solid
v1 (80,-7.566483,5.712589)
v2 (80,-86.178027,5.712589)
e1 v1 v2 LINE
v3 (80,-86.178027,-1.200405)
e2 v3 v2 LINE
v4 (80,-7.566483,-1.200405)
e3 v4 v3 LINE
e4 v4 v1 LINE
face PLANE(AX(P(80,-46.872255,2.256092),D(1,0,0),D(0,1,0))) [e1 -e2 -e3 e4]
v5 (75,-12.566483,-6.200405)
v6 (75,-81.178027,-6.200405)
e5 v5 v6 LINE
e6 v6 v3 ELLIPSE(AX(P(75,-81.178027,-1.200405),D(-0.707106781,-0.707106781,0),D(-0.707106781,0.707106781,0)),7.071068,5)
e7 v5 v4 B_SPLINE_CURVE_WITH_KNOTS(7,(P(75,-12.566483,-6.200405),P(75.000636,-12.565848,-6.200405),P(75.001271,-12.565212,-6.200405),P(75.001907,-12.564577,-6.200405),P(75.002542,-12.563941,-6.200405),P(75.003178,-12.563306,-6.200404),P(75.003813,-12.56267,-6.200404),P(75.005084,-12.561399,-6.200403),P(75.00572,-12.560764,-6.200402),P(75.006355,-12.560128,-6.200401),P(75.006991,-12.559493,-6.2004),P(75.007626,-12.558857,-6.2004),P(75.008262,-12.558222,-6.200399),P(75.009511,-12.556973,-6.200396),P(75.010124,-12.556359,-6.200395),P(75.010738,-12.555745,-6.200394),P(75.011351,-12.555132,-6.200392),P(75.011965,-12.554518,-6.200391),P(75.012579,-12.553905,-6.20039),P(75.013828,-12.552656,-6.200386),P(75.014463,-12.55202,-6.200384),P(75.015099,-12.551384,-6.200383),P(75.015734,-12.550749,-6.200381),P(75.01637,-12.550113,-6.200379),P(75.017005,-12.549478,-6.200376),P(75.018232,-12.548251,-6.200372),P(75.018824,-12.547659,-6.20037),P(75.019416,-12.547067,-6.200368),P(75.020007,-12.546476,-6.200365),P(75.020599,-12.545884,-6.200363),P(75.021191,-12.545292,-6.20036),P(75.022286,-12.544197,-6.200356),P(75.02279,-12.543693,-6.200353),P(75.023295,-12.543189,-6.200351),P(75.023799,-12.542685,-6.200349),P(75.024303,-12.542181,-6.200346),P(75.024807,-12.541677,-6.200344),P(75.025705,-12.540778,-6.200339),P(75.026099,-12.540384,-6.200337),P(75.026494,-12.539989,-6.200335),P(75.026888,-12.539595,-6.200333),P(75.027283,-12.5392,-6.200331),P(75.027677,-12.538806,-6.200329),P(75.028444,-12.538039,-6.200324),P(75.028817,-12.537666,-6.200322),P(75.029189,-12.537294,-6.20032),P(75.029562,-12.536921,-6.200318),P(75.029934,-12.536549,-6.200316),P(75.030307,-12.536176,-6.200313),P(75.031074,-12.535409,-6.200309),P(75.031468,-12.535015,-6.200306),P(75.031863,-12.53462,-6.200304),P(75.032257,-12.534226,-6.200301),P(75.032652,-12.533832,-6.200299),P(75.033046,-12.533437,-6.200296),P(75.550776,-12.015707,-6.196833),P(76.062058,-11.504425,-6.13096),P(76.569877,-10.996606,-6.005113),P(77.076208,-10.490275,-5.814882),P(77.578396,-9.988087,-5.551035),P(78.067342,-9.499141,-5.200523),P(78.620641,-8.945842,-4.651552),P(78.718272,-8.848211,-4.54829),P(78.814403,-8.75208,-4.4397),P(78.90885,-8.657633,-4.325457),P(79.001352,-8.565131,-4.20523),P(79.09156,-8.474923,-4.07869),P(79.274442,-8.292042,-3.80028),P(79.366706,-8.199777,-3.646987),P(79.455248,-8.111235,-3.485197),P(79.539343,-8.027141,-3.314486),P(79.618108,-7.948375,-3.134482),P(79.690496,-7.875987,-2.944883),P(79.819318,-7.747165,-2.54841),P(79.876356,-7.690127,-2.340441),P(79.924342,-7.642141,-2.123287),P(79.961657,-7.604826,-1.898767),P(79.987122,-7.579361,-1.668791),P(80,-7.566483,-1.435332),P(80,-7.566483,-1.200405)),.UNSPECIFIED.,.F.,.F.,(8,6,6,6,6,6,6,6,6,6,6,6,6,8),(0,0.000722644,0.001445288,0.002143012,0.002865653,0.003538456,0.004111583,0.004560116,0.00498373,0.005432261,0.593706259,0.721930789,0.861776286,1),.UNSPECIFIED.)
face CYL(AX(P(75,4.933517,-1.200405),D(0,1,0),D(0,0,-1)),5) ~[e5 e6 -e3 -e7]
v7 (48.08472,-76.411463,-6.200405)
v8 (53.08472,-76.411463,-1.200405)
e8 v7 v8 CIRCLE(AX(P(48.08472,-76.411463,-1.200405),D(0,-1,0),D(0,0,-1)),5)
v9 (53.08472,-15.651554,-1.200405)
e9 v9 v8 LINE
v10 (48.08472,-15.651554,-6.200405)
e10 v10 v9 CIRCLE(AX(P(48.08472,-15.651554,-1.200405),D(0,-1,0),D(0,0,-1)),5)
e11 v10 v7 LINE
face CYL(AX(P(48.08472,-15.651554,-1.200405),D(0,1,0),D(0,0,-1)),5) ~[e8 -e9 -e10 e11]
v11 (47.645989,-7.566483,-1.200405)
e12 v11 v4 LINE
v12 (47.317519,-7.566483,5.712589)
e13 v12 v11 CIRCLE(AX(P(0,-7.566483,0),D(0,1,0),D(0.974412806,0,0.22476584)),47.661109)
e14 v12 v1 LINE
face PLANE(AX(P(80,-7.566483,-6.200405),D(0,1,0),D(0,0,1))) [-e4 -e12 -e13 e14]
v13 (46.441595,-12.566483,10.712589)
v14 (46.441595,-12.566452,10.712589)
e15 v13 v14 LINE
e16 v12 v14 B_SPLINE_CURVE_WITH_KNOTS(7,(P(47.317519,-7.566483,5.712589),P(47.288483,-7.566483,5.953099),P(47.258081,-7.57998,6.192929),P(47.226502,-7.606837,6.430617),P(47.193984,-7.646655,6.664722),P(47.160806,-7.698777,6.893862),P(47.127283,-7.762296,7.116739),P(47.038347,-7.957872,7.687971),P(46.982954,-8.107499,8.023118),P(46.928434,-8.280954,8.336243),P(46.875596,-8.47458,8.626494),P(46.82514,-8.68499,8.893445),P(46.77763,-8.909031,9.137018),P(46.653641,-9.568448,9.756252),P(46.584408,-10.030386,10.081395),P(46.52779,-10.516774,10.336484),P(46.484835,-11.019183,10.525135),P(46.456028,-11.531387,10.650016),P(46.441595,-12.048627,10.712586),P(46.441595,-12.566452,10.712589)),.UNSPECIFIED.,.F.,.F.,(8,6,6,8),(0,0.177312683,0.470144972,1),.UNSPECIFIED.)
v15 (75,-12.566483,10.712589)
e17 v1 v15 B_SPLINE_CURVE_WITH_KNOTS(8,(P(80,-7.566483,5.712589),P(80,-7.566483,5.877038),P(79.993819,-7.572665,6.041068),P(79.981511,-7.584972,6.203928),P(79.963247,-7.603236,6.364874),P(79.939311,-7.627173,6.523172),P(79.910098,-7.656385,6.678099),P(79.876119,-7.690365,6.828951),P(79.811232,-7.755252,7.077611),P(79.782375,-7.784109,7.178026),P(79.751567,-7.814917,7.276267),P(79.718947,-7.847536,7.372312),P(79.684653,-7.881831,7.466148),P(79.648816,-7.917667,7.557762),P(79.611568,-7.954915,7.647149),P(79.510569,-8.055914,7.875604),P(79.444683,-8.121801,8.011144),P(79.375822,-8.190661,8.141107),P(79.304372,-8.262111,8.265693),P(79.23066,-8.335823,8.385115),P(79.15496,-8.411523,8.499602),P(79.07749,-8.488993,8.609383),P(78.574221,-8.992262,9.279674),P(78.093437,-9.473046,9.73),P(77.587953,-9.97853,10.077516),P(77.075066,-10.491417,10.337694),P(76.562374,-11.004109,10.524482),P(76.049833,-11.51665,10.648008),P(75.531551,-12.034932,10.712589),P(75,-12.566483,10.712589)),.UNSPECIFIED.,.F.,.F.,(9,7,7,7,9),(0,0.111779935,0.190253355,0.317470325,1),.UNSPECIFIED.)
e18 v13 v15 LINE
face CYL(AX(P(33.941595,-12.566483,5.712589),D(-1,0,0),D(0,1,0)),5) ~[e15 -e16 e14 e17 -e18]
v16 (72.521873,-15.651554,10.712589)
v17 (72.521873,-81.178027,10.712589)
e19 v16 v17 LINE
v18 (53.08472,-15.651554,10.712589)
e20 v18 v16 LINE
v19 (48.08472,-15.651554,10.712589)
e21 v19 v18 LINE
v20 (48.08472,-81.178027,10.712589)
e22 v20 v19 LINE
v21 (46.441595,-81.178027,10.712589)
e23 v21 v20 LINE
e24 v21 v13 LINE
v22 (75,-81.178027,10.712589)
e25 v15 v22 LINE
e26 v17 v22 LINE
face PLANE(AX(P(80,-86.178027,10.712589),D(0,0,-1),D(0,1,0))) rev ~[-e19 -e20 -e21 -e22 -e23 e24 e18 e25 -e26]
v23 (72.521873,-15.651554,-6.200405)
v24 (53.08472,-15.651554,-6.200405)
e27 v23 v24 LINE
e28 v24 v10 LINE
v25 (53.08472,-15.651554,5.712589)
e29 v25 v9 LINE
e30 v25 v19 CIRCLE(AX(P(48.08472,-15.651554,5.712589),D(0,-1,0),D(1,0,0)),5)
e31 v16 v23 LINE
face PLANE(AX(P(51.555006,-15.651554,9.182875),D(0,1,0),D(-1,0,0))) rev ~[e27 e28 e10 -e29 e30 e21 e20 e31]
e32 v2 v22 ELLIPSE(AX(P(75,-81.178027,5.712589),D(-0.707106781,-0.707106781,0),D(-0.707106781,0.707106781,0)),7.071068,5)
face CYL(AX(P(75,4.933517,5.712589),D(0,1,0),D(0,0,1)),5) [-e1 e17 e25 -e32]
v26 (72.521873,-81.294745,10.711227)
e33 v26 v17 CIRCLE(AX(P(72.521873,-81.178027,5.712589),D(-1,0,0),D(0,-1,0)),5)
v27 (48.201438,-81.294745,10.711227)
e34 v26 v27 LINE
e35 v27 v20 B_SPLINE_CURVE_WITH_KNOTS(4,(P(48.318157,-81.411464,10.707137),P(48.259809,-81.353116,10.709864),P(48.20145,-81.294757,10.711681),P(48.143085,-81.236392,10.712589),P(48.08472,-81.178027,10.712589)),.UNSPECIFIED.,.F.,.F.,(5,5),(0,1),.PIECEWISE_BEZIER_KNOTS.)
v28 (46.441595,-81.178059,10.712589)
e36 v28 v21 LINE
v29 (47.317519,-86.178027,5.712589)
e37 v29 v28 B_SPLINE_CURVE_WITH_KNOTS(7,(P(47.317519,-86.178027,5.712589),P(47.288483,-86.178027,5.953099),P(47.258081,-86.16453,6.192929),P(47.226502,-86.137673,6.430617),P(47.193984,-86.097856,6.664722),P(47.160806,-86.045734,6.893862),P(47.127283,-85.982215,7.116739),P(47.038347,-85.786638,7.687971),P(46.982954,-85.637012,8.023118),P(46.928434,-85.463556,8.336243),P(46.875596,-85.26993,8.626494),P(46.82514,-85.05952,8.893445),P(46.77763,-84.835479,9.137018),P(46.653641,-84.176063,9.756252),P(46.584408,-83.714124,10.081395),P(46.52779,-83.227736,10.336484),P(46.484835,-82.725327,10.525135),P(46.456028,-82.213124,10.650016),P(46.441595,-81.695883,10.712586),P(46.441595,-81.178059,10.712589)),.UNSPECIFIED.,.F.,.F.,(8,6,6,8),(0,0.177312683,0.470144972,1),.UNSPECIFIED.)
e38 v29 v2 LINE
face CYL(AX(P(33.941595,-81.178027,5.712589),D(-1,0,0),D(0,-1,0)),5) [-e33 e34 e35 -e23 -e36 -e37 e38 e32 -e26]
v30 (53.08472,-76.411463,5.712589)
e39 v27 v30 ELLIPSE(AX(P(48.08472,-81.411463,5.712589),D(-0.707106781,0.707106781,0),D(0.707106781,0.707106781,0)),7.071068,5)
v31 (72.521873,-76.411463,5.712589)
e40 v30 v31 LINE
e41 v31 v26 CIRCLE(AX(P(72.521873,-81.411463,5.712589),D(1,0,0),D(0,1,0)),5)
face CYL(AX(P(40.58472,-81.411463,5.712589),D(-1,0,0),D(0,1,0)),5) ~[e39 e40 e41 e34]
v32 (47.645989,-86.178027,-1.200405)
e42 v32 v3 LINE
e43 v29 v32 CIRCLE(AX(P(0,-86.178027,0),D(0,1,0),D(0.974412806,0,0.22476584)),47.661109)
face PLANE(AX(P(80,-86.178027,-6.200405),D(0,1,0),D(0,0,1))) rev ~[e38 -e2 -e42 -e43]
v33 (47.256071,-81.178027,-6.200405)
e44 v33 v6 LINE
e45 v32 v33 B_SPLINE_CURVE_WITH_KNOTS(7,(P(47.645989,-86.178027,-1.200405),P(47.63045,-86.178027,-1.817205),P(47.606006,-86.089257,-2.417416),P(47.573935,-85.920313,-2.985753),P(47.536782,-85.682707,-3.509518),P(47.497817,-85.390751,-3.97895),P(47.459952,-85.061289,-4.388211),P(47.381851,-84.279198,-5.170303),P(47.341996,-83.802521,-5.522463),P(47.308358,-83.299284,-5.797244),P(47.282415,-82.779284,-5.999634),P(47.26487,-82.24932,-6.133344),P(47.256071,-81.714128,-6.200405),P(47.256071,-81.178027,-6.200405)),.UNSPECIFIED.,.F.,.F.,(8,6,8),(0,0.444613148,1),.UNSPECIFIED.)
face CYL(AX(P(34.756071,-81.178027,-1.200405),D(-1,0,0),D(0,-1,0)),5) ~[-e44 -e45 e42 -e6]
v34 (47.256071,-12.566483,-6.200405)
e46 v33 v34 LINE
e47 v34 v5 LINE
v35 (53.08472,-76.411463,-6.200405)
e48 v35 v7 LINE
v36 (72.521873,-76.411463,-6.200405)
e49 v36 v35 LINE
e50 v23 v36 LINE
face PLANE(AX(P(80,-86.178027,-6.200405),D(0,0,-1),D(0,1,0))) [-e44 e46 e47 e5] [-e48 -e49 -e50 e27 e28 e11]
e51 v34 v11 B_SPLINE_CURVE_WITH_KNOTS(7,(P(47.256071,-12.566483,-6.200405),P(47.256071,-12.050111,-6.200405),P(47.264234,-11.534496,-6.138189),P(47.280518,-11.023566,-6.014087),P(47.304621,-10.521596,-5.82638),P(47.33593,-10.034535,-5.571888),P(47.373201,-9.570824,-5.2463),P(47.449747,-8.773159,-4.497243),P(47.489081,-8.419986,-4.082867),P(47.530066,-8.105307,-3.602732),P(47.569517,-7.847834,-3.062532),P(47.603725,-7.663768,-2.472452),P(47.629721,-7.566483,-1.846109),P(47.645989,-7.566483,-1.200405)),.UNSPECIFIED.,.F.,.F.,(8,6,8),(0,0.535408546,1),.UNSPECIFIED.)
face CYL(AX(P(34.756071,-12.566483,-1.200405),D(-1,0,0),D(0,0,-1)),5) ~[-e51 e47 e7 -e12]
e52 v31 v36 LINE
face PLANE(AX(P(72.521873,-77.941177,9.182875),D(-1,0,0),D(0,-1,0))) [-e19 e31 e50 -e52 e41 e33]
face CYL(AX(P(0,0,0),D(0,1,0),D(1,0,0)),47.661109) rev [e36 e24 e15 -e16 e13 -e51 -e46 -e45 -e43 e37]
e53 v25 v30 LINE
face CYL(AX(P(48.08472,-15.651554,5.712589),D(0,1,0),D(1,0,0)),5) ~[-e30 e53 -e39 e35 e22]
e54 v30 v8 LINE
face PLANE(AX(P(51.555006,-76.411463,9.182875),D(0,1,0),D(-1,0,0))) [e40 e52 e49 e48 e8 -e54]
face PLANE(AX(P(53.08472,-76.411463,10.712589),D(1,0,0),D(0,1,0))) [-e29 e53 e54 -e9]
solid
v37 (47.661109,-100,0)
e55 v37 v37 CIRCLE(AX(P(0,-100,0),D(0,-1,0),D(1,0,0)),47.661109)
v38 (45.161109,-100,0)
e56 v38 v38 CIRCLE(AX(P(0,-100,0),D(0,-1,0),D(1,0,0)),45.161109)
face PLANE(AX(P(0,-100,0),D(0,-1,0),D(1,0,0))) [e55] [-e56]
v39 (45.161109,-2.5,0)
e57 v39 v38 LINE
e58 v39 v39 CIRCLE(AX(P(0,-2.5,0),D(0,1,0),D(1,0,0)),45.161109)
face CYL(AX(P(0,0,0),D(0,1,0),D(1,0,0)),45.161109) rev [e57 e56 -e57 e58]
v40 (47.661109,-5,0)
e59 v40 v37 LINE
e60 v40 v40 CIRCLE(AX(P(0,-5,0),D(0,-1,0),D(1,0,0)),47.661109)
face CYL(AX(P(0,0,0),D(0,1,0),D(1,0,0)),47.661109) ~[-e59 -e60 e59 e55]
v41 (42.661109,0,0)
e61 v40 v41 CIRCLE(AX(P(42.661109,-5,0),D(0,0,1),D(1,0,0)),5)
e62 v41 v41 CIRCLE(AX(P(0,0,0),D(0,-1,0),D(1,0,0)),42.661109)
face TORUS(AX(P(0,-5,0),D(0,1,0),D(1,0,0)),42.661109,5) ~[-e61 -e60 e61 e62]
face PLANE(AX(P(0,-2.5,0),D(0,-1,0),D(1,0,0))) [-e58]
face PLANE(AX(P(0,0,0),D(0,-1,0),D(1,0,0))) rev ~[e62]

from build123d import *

# Parameters (mm, degrees)
F0_R         = 47.6611087375
F1_DEPTH     = 100
F2_T         = -2.5
F4_W         = 78.6115438677
F4_H         = 16.9129944406
F6_W         = 19.4371528924
F6_H         = 60.759909451
F7_DEPTH     = 25
F8_T1_DEPTH  = 57.743928854
F8_T3_DEPTH  = 58.5584052808
F8_T5_DEPTH  = 103.6115438677
F8_T7_DEPTH  = 60.759909451
F8_T9_DEPTH  = 19.4371528924
F8_T15_DEPTH = 73.259909451
F8_T20_DEPTH = 31.9371528924
F8_S22_R     = 47.6611087375
F8_T23_DEPTH = 18
F9_R         = 5


# Not quite as in the source:
# - a fillet or chamfer that OpenCascade refuses, or shapes differently, is made with other operations: its cross-section is extruded or revolved along the edge and cut away or added


with BuildPart() as f1:
    # F0 (on Front) → F1 (new body)
    with BuildSketch(Plane.XZ):
        Circle(F0_R)
    extrude(amount=F1_DEPTH)

    # F2
    f2_openings = [f1.faces().sort_by_distance(p)[0] for p in [
        (0, -100, 0),
    ]]
    offset(amount=F2_T, openings=f2_openings)


with BuildPart() as f5:
    # F4 (on offset) → F5 (new body, up to the next surface of F1)
    with BuildSketch(Plane.YZ.offset(80)):
        with Locations((-46.8722551595, 2.2560919169)):
            Rectangle(F4_W, F4_H)
    extrude(until=Until.NEXT, target=f1.part, dir=(-1, 0, 0))

    # F6 (on face) → F7 (cut)
    with BuildSketch(Plane.XY.offset(10.7125891373)):
        with Locations((62.8032963723, -46.0315085948)):
            Rectangle(F6_W, F6_H)
    extrude(amount=-F7_DEPTH, mode=Mode.SUBTRACT)

    # F8: fillet of radius 5 on 9 edges, made by hand

    # F8_s2 → F8_t1 (cut)
    with BuildSketch(Plane.YZ.offset(34.756071146)):
        with BuildLine():
            ThreePointArc((-86.1780270934, -1.2004053034), (-84.7135609993, -4.7359392093), (-81.1780270934, -6.2004053034))
            Line((-81.1780270934, -6.2004053034), (-86.1780270934, -6.2004053034))
            Line((-86.1780270934, -6.2004053034), (-86.1780270934, -1.2004053034))
        make_face()
        with BuildLine():
            ThreePointArc((-12.5664832257, -6.2004053034), (-9.0309493197, -4.7359392093), (-7.5664832257, -1.2004053034))
            Line((-7.5664832257, -1.2004053034), (-7.5664832257, -6.2004053034))
            Line((-7.5664832257, -6.2004053034), (-12.5664832257, -6.2004053034))
        make_face()
    extrude(amount=F8_T1_DEPTH, mode=Mode.SUBTRACT)

    # F8_s4 → F8_t3 (cut)
    with BuildSketch(Plane.YZ.offset(33.9415947192)):
        with BuildLine():
            ThreePointArc((-86.1780270934, 5.7125891373), (-84.7135609993, 9.2481230432), (-81.1780270934, 10.7125891373))
            Line((-81.1780270934, 10.7125891373), (-86.1780270934, 10.7125891373))
            Line((-86.1780270934, 10.7125891373), (-86.1780270934, 5.7125891373))
        make_face()
        with BuildLine():
            ThreePointArc((-7.5664832257, 5.7125891373), (-9.0309493197, 9.2481230432), (-12.5664832257, 10.7125891373))
            Line((-12.5664832257, 10.7125891373), (-7.5664832257, 10.7125891373))
            Line((-7.5664832257, 10.7125891373), (-7.5664832257, 5.7125891373))
        make_face()
    extrude(amount=F8_T3_DEPTH, mode=Mode.SUBTRACT)

    # F8_s6 → F8_t5 (cut)
    with BuildSketch(Plane.XZ.offset(-4.9335167743)):
        with BuildLine():
            ThreePointArc((75, 10.7125891373), (78.5355339059, 9.2481230432), (80, 5.7125891373))
            Line((80, 5.7125891373), (80, 10.7125891373))
            Line((80, 10.7125891373), (75, 10.7125891373))
        make_face()
        with BuildLine():
            ThreePointArc((75, -6.2004053034), (78.5355339059, -4.7359392093), (80, -1.2004053034))
            Line((80, -1.2004053034), (80, -6.2004053034))
            Line((80, -6.2004053034), (75, -6.2004053034))
        make_face()
    extrude(amount=F8_T5_DEPTH, mode=Mode.SUBTRACT)

    # F8_s8 → F8_t7 (cut)
    with BuildSketch(Plane.XZ.offset(15.6515538692)):
        with BuildLine():
            ThreePointArc((53.0847199261, 5.7125891373), (51.6202538321, 9.2481230432), (48.0847199261, 10.7125891373))
            Line((48.0847199261, 10.7125891373), (53.0847199261, 10.7125891373))
            Line((53.0847199261, 10.7125891373), (53.0847199261, 5.7125891373))
        make_face()
        with BuildLine():
            ThreePointArc((48.0847199261, -6.2004053034), (51.6202538321, -4.7359392093), (53.0847199261, -1.2004053034))
            Line((53.0847199261, -1.2004053034), (53.0847199261, -6.2004053034))
            Line((53.0847199261, -6.2004053034), (48.0847199261, -6.2004053034))
        make_face()
    extrude(amount=F8_T7_DEPTH, mode=Mode.SUBTRACT)

    # F8_s10 → F8_t9 (cut)
    with BuildSketch(Plane.YZ.offset(53.0847199261)):
        with BuildLine():
            ThreePointArc((-76.4114633203, 5.7125891373), (-77.8759294143, 9.2481230432), (-81.4114633203, 10.7125891373))
            Line((-81.4114633203, 10.7125891373), (-76.4114633203, 10.7125891373))
            Line((-76.4114633203, 10.7125891373), (-76.4114633203, 5.7125891373))
        make_face()
    extrude(amount=F8_T9_DEPTH, mode=Mode.SUBTRACT)


with BuildPart() as f8_tool13:
    # F8_s14 → F8_t15 (new body)
    with BuildSketch(Plane.XZ.offset(15.6515538692)):
        with BuildLine():
            ThreePointArc((53.0847199261, 5.7125891373), (51.6202538321, 9.2481230432), (48.0847199261, 10.7125891373))
            Line((48.0847199261, 10.7125891373), (53.0847199261, 10.7125891373))
            Line((53.0847199261, 10.7125891373), (53.0847199261, 5.7125891373))
        make_face()
    extrude(amount=F8_T15_DEPTH)

    split(bisect_by=Plane.XZ.offset(86.1780270934), keep=Keep.BOTTOM)

    split(bisect_by=Plane.XZ.offset(76.4114633203), keep=Keep.TOP)


with BuildPart() as f8_tool18:
    # F8_s19 → F8_t20 (new body)
    with BuildSketch(Plane.YZ.offset(40.5847199261)):
        with BuildLine():
            ThreePointArc((-76.4114633203, 5.7125891373), (-77.8759294143, 9.2481230432), (-81.4114633203, 10.7125891373))
            Line((-81.4114633203, 10.7125891373), (-76.4114633203, 10.7125891373))
            Line((-76.4114633203, 10.7125891373), (-76.4114633203, 5.7125891373))
        make_face()
    extrude(amount=F8_T20_DEPTH)

    split(bisect_by=Plane.YZ.offset(53.0847199261), keep=Keep.BOTTOM)

    # F8_s22 → F8_t23 (cut, symmetric)
    with BuildSketch(Plane.XZ.offset(78.9)):
        Circle(F8_S22_R)
    extrude(amount=F8_T23_DEPTH, both=True, mode=Mode.SUBTRACT)


with BuildPart() as f8_tool13_1:
    add(f8_tool13.part)

    # F8_t24: intersect F8_tool18
    add(f8_tool18.part, mode=Mode.INTERSECT)


with BuildPart() as f5_1:
    add(f5.part)

    # F8_t11: cut F8_tool13
    add(f8_tool13_1.part, mode=Mode.SUBTRACT)


with BuildPart() as f1_1:
    add(f1.part)

    # F9
    f9_edges = [f1_1.edges().sort_by_distance(p)[0] for p in [
        (-47.661109, 0, 0),
    ]]
    fillet(f9_edges, radius=F9_R)


solid = Compound([f5_1.part, f1_1.part])
